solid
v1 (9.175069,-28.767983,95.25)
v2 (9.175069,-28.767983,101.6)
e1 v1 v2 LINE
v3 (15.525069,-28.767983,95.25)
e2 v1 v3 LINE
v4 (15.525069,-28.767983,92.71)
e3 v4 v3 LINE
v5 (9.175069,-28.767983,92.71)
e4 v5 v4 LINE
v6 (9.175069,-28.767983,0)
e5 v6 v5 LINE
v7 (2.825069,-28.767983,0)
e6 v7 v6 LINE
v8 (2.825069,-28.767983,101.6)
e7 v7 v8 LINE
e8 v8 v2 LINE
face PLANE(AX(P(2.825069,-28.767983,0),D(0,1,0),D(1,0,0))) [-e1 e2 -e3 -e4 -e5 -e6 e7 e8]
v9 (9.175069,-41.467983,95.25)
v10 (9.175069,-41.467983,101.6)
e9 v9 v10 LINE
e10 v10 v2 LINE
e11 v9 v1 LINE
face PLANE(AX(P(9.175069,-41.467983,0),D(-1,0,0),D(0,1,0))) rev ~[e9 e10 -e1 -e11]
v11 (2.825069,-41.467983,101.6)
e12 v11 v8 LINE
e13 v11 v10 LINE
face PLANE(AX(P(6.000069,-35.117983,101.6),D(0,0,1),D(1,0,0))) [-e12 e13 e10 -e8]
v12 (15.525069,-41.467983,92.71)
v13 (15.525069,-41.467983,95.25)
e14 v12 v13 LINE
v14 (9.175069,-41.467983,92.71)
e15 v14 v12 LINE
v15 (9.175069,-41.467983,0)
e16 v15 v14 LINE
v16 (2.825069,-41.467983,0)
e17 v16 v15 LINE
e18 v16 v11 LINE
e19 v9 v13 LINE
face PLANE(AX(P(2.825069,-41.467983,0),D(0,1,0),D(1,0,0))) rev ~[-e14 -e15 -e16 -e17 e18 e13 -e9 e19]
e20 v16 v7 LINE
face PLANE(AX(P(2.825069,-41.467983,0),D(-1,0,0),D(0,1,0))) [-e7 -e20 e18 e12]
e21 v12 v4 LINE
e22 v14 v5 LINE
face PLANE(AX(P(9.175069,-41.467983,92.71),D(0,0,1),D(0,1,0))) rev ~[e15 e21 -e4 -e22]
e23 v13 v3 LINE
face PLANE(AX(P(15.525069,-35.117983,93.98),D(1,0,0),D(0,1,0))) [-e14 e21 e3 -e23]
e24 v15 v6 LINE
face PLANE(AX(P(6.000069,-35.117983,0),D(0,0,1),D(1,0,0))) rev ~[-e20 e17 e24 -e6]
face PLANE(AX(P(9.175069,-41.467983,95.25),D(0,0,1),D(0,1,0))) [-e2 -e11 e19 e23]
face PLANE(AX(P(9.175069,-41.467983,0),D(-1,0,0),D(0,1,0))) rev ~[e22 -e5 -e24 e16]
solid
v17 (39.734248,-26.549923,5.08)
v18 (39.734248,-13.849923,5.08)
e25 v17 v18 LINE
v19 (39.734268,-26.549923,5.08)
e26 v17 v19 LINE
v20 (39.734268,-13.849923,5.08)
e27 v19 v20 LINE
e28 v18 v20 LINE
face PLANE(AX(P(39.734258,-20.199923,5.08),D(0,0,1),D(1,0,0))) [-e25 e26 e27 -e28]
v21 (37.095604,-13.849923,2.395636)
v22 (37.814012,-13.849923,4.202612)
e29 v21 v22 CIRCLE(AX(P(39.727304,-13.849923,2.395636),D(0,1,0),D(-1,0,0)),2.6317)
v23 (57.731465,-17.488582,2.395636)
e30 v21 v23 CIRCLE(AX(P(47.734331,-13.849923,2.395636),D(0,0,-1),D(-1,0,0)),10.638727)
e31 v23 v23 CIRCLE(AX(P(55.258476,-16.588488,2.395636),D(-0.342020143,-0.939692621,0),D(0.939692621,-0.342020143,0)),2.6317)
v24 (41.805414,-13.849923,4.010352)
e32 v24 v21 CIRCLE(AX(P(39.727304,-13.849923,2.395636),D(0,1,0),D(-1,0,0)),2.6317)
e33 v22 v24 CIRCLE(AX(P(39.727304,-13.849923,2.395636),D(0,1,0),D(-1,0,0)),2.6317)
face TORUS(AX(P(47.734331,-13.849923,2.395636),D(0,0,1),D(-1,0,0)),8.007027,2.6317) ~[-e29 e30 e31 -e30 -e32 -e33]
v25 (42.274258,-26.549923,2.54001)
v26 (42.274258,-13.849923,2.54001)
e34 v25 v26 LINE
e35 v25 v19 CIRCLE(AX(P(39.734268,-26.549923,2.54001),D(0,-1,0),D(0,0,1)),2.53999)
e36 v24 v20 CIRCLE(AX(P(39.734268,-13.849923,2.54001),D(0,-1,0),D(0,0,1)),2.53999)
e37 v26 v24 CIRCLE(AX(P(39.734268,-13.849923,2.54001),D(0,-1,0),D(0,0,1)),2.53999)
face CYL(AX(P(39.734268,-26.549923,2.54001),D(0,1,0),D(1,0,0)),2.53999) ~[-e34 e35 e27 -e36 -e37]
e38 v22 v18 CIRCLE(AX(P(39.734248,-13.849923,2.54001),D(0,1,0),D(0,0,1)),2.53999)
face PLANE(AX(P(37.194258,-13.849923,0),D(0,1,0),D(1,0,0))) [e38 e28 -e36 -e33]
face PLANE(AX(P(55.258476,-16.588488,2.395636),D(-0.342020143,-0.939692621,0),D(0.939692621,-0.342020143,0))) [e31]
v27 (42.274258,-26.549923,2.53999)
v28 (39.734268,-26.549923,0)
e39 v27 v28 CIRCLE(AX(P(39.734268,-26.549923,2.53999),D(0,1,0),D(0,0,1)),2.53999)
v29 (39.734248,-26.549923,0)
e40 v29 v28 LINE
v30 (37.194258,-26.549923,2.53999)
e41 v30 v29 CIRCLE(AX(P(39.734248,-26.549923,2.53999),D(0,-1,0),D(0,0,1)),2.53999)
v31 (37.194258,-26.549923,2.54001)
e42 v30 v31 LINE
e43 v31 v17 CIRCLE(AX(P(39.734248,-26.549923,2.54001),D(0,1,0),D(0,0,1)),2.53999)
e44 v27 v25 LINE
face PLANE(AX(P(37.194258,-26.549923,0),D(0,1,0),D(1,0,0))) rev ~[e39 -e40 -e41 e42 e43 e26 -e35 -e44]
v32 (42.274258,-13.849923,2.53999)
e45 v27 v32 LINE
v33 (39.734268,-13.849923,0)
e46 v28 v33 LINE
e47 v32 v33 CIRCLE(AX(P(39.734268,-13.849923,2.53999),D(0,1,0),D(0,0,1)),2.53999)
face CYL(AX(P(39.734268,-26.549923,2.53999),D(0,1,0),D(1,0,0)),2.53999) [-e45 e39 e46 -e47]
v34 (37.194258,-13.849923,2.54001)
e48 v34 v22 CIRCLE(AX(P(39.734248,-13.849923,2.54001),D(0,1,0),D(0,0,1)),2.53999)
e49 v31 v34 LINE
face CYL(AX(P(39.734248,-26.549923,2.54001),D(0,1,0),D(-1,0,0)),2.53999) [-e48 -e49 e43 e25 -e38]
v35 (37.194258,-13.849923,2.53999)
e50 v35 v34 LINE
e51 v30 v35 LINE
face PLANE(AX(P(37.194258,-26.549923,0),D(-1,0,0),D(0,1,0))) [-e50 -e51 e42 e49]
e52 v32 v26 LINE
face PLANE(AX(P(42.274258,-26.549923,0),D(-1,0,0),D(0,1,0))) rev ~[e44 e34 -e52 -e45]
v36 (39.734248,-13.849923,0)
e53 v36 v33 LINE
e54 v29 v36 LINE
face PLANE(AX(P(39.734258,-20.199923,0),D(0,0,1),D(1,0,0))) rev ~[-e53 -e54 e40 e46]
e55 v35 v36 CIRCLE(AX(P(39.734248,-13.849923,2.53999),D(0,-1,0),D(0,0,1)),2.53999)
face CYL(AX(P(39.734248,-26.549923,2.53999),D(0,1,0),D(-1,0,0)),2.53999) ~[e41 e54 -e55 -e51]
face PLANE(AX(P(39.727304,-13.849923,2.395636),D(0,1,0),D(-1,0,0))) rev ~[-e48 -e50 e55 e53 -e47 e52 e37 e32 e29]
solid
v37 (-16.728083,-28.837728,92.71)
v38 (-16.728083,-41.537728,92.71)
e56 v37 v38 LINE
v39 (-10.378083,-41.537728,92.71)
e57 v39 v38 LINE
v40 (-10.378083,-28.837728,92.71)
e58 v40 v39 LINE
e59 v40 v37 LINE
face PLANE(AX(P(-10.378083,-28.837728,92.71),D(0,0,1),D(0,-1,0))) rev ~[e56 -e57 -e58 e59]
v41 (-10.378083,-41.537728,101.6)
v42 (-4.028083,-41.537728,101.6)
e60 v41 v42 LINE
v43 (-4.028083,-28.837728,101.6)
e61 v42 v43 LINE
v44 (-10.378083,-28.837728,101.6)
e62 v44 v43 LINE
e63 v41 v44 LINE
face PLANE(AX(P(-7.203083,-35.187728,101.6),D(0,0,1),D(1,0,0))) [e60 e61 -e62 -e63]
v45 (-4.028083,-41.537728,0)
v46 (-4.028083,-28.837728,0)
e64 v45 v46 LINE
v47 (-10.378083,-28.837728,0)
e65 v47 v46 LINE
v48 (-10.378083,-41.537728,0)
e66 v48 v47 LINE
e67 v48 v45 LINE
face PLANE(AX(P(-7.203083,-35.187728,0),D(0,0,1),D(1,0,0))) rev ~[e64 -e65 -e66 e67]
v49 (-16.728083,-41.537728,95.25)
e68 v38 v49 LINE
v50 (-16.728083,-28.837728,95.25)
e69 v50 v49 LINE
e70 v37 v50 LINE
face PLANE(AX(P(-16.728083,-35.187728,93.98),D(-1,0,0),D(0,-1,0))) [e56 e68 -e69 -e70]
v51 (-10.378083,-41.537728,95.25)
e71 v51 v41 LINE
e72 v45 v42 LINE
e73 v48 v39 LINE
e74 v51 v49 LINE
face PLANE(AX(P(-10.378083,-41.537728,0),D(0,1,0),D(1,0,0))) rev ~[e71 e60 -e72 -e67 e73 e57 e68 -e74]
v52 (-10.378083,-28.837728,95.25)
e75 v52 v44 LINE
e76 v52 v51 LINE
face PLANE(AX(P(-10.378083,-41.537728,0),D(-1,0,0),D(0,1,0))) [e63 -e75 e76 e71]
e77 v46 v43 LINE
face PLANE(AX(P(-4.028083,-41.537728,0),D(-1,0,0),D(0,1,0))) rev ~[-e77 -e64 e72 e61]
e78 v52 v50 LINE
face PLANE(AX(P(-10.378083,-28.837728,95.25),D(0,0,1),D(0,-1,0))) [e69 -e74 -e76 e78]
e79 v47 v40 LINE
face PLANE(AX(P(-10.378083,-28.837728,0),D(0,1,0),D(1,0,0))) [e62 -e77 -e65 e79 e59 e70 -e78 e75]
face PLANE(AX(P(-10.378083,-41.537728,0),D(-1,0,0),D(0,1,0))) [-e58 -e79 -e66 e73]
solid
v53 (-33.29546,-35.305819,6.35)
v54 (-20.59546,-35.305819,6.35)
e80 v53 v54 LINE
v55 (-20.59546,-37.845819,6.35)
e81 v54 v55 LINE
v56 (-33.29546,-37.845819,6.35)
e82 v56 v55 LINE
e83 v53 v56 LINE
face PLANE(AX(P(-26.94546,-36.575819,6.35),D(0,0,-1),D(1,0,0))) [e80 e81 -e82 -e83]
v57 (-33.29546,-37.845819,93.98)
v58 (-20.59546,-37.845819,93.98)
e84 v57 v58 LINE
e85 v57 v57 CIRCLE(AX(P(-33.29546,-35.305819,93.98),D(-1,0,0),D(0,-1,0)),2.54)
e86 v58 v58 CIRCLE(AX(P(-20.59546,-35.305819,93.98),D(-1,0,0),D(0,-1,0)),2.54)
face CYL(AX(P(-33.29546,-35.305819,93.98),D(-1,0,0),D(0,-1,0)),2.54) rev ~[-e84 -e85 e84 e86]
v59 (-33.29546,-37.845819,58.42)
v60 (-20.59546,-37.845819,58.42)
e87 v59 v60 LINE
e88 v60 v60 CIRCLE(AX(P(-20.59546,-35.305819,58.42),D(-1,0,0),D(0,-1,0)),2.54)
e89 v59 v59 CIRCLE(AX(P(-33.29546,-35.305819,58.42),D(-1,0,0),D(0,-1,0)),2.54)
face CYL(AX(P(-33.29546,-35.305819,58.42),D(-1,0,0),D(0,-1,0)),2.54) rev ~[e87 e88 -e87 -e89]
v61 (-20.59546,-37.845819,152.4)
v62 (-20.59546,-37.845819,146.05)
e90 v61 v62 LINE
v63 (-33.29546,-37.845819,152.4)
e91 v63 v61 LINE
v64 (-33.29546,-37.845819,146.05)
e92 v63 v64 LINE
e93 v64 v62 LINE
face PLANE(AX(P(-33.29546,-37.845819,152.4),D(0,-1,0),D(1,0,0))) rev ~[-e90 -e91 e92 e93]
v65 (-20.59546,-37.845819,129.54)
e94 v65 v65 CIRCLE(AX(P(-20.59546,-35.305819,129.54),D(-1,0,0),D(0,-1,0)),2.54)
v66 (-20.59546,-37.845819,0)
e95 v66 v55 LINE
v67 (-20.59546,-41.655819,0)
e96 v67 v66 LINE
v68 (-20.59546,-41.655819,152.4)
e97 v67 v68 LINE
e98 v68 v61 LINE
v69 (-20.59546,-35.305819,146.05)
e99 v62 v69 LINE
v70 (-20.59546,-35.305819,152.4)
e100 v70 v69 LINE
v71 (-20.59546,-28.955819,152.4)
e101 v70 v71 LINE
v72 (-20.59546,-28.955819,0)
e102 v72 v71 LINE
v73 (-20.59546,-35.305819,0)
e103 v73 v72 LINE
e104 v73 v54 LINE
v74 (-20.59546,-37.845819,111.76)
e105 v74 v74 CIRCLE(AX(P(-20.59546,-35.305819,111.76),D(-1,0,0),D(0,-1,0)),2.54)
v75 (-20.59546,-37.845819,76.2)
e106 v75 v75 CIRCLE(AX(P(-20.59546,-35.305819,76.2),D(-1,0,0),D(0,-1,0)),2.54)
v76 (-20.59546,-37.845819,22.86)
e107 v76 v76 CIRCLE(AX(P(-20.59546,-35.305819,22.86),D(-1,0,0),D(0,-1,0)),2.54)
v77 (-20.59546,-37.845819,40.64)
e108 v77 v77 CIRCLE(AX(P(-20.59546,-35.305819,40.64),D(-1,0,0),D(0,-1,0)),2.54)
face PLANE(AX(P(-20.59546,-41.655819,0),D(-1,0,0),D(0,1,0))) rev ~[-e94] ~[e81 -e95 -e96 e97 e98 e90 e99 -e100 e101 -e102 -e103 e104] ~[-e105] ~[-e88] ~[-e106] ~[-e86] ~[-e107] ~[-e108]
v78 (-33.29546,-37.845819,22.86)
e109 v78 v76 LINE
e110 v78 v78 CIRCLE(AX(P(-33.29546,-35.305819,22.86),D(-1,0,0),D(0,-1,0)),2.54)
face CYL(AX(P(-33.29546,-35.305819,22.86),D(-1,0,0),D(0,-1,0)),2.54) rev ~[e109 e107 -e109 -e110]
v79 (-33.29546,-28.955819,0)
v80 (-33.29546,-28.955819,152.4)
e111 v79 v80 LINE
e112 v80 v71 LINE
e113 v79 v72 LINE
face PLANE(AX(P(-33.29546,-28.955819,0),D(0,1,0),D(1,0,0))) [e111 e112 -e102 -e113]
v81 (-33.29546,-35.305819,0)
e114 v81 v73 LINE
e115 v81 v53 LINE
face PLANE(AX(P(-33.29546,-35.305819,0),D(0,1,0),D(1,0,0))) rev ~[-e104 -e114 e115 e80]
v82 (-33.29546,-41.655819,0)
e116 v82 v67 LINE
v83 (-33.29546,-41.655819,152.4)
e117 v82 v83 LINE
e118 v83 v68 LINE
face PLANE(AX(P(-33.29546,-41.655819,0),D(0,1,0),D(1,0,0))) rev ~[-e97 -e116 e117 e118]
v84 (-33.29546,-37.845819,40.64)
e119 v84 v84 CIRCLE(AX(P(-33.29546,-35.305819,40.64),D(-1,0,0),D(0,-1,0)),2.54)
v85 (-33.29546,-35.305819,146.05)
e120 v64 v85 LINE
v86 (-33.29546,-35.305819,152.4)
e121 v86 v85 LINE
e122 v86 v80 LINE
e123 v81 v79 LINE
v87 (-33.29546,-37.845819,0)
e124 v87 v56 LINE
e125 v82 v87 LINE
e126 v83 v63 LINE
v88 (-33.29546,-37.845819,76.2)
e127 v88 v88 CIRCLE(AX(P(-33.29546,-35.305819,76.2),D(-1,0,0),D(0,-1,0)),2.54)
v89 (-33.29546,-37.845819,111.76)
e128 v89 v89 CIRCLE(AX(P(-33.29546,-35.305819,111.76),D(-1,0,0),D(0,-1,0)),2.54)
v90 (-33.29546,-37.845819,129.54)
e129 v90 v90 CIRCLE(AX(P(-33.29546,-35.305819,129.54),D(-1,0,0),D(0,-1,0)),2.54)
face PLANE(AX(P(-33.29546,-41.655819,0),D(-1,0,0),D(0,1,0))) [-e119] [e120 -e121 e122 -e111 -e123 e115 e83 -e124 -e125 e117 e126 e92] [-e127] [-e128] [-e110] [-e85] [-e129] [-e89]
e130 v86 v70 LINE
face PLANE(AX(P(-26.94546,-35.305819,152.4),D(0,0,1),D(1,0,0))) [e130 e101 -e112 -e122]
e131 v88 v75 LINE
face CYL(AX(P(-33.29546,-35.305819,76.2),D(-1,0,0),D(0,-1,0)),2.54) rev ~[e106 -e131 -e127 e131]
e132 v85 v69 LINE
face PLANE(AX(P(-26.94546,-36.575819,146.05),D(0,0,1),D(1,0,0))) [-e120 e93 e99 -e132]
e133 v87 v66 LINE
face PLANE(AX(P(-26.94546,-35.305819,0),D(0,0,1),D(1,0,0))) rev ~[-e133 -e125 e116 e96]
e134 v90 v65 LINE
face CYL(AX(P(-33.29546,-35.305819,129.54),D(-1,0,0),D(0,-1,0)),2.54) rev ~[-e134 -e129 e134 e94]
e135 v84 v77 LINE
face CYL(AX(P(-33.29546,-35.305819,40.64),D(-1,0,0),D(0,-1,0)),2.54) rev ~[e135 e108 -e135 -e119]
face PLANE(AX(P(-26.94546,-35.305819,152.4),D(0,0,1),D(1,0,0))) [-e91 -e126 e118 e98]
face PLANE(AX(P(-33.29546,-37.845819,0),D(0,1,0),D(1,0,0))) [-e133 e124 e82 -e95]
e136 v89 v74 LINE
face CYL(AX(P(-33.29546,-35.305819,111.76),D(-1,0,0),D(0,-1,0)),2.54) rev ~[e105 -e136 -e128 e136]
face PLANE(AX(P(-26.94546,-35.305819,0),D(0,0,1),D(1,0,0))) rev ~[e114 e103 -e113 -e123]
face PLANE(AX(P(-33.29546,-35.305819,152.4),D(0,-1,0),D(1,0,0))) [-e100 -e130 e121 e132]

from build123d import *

# Parameters (mm, degrees)
F0_W      = 6.35
F0_H      = 12.7
F1_DEPTH  = 101.6
F2_W      = 12.7
F2_H      = 2.54
F3_DEPTH  = 6.35
F4_W      = 12.7
F4_H      = 2.54
F5_DEPTH  = 6.35
F6_W      = 12.7
F6_H      = 12.7
F7_DEPTH  = 152.4
F8_W      = 12.7
F8_H      = 2.54
F9_DEPTH  = 6.35
F10_W     = 12.7
F10_H     = 2.54
F11_DEPTH = 6.35
F12_R     = 2.54
F13_DEPTH = 12.7
F14_W     = 5.08
F14_H     = 12.7
F15_DEPTH = 5.08
F16_R     = 2.53999
F18_R     = 2.6317001642
F19_ANGLE = 200


# Not quite as in the source:
# - a fillet or chamfer is up to 0.001 mm smaller than in the source, because OpenCascade refuses the exact size


with BuildPart() as f1:
    # F0 (on Top) → F1 (new body)
    with BuildSketch(Plane.XY):
        with Locations((-7.2030832142, -35.1877281606)):
            Rectangle(F0_W, F0_H)
    extrude(amount=F1_DEPTH)

    # F4 (on face) → F5 (join)
    with BuildSketch(Plane(origin=(-10.3780832142, 0, 0), x_dir=(0, -1, 0), z_dir=(-1, 0, 0))):
        with Locations((35.1877281606, 93.98)):
            Rectangle(F4_W, F4_H)
    extrude(amount=F5_DEPTH)


with BuildPart() as f1b:
    # F0 (on Top) → F1, piece 2 (new body)
    with BuildSketch(Plane.XY):
        with Locations((6.0000692412, -35.1179832757)):
            Rectangle(F0_W, F0_H)
    extrude(amount=F1_DEPTH)

    # F2 (on face) → F3 (join)
    with BuildSketch(Plane.YZ.offset(9.1750692412)):
        with Locations((-35.1179832757, 93.98)):
            Rectangle(F2_W, F2_H)
    extrude(amount=F3_DEPTH)


with BuildPart() as f7:
    # F6 (on Top) → F7 (new body)
    with BuildSketch(Plane.XY):
        with Locations((-26.9454600453, -35.3058190852)):
            Rectangle(F6_W, F6_H)
    extrude(amount=F7_DEPTH)

    # F8 (on face) → F9 (cut)
    with BuildSketch(Plane.XY.offset(152.4)):
        with Locations((-26.9454600453, -36.5758190852)):
            Rectangle(F8_W, F8_H)
    extrude(amount=-F9_DEPTH, mode=Mode.SUBTRACT)

    # F10 (on face) → F11 (cut)
    with BuildSketch(Plane(origin=(0, 0, 0), x_dir=(1, 0, 0), z_dir=(0, 0, -1))):
        with Locations((-26.9454600453, 36.5758190852)):
            Rectangle(F10_W, F10_H)
    extrude(amount=-F11_DEPTH, mode=Mode.SUBTRACT)

    # F12 (on face) → F13 (cut)
    with BuildSketch(Plane(origin=(-33.2954600453, 0, 0), x_dir=(0, -1, 0), z_dir=(-1, 0, 0))):
        with Locations((35.3058190852, 22.86)):
            Circle(F12_R)
        with Locations((35.3058190852, 40.64)):
            Circle(F12_R)
        with Locations((35.3058190852, 76.2)):
            Circle(F12_R)
        with Locations((35.3058190852, 93.98)):
            Circle(F12_R)
        with Locations((35.3058190852, 111.76)):
            Circle(F12_R)
        with Locations((35.3058190852, 58.42)):
            Circle(F12_R)
        with Locations((35.3058190852, 129.54)):
            Circle(F12_R)
    extrude(amount=-F13_DEPTH, mode=Mode.SUBTRACT)


with BuildPart() as f15:
    # F14 (on Top) → F15 (new body)
    with BuildSketch(Plane.XY):
        with Locations((39.7342580192, -20.1999229612)):
            Rectangle(F14_W, F14_H)
    extrude(amount=F15_DEPTH)

    # F16 (radius 2.54 in the source; OpenCascade refuses exactly that, so slightly less here)
    f16_edges = [f15.edges().sort_by_distance(p)[0] for p in [
        (42.274258, -20.199923, 5.08),
        (37.194258, -20.199923, 5.08),
        (42.274258, -20.199923, 0),
        (37.194258, -20.199923, 0),
    ]]
    fillet(f16_edges, radius=F16_R)

    # F18 (on offset) → F19 (revolve)
    with BuildSketch(Plane(origin=(0, -13.8499229612, 0), x_dir=(-1, 0, 0), z_dir=(0, 1, 0))):
        with Locations((-39.7273041308, 2.3956361692)):
            Circle(F18_R)
    revolve(axis=Axis((47.7343313396, -13.8499229612, 0.46519842), (0, 0, -1)), revolution_arc=F19_ANGLE)


solid = Compound([f1.part, f1b.part, f7.part, f15.part])
